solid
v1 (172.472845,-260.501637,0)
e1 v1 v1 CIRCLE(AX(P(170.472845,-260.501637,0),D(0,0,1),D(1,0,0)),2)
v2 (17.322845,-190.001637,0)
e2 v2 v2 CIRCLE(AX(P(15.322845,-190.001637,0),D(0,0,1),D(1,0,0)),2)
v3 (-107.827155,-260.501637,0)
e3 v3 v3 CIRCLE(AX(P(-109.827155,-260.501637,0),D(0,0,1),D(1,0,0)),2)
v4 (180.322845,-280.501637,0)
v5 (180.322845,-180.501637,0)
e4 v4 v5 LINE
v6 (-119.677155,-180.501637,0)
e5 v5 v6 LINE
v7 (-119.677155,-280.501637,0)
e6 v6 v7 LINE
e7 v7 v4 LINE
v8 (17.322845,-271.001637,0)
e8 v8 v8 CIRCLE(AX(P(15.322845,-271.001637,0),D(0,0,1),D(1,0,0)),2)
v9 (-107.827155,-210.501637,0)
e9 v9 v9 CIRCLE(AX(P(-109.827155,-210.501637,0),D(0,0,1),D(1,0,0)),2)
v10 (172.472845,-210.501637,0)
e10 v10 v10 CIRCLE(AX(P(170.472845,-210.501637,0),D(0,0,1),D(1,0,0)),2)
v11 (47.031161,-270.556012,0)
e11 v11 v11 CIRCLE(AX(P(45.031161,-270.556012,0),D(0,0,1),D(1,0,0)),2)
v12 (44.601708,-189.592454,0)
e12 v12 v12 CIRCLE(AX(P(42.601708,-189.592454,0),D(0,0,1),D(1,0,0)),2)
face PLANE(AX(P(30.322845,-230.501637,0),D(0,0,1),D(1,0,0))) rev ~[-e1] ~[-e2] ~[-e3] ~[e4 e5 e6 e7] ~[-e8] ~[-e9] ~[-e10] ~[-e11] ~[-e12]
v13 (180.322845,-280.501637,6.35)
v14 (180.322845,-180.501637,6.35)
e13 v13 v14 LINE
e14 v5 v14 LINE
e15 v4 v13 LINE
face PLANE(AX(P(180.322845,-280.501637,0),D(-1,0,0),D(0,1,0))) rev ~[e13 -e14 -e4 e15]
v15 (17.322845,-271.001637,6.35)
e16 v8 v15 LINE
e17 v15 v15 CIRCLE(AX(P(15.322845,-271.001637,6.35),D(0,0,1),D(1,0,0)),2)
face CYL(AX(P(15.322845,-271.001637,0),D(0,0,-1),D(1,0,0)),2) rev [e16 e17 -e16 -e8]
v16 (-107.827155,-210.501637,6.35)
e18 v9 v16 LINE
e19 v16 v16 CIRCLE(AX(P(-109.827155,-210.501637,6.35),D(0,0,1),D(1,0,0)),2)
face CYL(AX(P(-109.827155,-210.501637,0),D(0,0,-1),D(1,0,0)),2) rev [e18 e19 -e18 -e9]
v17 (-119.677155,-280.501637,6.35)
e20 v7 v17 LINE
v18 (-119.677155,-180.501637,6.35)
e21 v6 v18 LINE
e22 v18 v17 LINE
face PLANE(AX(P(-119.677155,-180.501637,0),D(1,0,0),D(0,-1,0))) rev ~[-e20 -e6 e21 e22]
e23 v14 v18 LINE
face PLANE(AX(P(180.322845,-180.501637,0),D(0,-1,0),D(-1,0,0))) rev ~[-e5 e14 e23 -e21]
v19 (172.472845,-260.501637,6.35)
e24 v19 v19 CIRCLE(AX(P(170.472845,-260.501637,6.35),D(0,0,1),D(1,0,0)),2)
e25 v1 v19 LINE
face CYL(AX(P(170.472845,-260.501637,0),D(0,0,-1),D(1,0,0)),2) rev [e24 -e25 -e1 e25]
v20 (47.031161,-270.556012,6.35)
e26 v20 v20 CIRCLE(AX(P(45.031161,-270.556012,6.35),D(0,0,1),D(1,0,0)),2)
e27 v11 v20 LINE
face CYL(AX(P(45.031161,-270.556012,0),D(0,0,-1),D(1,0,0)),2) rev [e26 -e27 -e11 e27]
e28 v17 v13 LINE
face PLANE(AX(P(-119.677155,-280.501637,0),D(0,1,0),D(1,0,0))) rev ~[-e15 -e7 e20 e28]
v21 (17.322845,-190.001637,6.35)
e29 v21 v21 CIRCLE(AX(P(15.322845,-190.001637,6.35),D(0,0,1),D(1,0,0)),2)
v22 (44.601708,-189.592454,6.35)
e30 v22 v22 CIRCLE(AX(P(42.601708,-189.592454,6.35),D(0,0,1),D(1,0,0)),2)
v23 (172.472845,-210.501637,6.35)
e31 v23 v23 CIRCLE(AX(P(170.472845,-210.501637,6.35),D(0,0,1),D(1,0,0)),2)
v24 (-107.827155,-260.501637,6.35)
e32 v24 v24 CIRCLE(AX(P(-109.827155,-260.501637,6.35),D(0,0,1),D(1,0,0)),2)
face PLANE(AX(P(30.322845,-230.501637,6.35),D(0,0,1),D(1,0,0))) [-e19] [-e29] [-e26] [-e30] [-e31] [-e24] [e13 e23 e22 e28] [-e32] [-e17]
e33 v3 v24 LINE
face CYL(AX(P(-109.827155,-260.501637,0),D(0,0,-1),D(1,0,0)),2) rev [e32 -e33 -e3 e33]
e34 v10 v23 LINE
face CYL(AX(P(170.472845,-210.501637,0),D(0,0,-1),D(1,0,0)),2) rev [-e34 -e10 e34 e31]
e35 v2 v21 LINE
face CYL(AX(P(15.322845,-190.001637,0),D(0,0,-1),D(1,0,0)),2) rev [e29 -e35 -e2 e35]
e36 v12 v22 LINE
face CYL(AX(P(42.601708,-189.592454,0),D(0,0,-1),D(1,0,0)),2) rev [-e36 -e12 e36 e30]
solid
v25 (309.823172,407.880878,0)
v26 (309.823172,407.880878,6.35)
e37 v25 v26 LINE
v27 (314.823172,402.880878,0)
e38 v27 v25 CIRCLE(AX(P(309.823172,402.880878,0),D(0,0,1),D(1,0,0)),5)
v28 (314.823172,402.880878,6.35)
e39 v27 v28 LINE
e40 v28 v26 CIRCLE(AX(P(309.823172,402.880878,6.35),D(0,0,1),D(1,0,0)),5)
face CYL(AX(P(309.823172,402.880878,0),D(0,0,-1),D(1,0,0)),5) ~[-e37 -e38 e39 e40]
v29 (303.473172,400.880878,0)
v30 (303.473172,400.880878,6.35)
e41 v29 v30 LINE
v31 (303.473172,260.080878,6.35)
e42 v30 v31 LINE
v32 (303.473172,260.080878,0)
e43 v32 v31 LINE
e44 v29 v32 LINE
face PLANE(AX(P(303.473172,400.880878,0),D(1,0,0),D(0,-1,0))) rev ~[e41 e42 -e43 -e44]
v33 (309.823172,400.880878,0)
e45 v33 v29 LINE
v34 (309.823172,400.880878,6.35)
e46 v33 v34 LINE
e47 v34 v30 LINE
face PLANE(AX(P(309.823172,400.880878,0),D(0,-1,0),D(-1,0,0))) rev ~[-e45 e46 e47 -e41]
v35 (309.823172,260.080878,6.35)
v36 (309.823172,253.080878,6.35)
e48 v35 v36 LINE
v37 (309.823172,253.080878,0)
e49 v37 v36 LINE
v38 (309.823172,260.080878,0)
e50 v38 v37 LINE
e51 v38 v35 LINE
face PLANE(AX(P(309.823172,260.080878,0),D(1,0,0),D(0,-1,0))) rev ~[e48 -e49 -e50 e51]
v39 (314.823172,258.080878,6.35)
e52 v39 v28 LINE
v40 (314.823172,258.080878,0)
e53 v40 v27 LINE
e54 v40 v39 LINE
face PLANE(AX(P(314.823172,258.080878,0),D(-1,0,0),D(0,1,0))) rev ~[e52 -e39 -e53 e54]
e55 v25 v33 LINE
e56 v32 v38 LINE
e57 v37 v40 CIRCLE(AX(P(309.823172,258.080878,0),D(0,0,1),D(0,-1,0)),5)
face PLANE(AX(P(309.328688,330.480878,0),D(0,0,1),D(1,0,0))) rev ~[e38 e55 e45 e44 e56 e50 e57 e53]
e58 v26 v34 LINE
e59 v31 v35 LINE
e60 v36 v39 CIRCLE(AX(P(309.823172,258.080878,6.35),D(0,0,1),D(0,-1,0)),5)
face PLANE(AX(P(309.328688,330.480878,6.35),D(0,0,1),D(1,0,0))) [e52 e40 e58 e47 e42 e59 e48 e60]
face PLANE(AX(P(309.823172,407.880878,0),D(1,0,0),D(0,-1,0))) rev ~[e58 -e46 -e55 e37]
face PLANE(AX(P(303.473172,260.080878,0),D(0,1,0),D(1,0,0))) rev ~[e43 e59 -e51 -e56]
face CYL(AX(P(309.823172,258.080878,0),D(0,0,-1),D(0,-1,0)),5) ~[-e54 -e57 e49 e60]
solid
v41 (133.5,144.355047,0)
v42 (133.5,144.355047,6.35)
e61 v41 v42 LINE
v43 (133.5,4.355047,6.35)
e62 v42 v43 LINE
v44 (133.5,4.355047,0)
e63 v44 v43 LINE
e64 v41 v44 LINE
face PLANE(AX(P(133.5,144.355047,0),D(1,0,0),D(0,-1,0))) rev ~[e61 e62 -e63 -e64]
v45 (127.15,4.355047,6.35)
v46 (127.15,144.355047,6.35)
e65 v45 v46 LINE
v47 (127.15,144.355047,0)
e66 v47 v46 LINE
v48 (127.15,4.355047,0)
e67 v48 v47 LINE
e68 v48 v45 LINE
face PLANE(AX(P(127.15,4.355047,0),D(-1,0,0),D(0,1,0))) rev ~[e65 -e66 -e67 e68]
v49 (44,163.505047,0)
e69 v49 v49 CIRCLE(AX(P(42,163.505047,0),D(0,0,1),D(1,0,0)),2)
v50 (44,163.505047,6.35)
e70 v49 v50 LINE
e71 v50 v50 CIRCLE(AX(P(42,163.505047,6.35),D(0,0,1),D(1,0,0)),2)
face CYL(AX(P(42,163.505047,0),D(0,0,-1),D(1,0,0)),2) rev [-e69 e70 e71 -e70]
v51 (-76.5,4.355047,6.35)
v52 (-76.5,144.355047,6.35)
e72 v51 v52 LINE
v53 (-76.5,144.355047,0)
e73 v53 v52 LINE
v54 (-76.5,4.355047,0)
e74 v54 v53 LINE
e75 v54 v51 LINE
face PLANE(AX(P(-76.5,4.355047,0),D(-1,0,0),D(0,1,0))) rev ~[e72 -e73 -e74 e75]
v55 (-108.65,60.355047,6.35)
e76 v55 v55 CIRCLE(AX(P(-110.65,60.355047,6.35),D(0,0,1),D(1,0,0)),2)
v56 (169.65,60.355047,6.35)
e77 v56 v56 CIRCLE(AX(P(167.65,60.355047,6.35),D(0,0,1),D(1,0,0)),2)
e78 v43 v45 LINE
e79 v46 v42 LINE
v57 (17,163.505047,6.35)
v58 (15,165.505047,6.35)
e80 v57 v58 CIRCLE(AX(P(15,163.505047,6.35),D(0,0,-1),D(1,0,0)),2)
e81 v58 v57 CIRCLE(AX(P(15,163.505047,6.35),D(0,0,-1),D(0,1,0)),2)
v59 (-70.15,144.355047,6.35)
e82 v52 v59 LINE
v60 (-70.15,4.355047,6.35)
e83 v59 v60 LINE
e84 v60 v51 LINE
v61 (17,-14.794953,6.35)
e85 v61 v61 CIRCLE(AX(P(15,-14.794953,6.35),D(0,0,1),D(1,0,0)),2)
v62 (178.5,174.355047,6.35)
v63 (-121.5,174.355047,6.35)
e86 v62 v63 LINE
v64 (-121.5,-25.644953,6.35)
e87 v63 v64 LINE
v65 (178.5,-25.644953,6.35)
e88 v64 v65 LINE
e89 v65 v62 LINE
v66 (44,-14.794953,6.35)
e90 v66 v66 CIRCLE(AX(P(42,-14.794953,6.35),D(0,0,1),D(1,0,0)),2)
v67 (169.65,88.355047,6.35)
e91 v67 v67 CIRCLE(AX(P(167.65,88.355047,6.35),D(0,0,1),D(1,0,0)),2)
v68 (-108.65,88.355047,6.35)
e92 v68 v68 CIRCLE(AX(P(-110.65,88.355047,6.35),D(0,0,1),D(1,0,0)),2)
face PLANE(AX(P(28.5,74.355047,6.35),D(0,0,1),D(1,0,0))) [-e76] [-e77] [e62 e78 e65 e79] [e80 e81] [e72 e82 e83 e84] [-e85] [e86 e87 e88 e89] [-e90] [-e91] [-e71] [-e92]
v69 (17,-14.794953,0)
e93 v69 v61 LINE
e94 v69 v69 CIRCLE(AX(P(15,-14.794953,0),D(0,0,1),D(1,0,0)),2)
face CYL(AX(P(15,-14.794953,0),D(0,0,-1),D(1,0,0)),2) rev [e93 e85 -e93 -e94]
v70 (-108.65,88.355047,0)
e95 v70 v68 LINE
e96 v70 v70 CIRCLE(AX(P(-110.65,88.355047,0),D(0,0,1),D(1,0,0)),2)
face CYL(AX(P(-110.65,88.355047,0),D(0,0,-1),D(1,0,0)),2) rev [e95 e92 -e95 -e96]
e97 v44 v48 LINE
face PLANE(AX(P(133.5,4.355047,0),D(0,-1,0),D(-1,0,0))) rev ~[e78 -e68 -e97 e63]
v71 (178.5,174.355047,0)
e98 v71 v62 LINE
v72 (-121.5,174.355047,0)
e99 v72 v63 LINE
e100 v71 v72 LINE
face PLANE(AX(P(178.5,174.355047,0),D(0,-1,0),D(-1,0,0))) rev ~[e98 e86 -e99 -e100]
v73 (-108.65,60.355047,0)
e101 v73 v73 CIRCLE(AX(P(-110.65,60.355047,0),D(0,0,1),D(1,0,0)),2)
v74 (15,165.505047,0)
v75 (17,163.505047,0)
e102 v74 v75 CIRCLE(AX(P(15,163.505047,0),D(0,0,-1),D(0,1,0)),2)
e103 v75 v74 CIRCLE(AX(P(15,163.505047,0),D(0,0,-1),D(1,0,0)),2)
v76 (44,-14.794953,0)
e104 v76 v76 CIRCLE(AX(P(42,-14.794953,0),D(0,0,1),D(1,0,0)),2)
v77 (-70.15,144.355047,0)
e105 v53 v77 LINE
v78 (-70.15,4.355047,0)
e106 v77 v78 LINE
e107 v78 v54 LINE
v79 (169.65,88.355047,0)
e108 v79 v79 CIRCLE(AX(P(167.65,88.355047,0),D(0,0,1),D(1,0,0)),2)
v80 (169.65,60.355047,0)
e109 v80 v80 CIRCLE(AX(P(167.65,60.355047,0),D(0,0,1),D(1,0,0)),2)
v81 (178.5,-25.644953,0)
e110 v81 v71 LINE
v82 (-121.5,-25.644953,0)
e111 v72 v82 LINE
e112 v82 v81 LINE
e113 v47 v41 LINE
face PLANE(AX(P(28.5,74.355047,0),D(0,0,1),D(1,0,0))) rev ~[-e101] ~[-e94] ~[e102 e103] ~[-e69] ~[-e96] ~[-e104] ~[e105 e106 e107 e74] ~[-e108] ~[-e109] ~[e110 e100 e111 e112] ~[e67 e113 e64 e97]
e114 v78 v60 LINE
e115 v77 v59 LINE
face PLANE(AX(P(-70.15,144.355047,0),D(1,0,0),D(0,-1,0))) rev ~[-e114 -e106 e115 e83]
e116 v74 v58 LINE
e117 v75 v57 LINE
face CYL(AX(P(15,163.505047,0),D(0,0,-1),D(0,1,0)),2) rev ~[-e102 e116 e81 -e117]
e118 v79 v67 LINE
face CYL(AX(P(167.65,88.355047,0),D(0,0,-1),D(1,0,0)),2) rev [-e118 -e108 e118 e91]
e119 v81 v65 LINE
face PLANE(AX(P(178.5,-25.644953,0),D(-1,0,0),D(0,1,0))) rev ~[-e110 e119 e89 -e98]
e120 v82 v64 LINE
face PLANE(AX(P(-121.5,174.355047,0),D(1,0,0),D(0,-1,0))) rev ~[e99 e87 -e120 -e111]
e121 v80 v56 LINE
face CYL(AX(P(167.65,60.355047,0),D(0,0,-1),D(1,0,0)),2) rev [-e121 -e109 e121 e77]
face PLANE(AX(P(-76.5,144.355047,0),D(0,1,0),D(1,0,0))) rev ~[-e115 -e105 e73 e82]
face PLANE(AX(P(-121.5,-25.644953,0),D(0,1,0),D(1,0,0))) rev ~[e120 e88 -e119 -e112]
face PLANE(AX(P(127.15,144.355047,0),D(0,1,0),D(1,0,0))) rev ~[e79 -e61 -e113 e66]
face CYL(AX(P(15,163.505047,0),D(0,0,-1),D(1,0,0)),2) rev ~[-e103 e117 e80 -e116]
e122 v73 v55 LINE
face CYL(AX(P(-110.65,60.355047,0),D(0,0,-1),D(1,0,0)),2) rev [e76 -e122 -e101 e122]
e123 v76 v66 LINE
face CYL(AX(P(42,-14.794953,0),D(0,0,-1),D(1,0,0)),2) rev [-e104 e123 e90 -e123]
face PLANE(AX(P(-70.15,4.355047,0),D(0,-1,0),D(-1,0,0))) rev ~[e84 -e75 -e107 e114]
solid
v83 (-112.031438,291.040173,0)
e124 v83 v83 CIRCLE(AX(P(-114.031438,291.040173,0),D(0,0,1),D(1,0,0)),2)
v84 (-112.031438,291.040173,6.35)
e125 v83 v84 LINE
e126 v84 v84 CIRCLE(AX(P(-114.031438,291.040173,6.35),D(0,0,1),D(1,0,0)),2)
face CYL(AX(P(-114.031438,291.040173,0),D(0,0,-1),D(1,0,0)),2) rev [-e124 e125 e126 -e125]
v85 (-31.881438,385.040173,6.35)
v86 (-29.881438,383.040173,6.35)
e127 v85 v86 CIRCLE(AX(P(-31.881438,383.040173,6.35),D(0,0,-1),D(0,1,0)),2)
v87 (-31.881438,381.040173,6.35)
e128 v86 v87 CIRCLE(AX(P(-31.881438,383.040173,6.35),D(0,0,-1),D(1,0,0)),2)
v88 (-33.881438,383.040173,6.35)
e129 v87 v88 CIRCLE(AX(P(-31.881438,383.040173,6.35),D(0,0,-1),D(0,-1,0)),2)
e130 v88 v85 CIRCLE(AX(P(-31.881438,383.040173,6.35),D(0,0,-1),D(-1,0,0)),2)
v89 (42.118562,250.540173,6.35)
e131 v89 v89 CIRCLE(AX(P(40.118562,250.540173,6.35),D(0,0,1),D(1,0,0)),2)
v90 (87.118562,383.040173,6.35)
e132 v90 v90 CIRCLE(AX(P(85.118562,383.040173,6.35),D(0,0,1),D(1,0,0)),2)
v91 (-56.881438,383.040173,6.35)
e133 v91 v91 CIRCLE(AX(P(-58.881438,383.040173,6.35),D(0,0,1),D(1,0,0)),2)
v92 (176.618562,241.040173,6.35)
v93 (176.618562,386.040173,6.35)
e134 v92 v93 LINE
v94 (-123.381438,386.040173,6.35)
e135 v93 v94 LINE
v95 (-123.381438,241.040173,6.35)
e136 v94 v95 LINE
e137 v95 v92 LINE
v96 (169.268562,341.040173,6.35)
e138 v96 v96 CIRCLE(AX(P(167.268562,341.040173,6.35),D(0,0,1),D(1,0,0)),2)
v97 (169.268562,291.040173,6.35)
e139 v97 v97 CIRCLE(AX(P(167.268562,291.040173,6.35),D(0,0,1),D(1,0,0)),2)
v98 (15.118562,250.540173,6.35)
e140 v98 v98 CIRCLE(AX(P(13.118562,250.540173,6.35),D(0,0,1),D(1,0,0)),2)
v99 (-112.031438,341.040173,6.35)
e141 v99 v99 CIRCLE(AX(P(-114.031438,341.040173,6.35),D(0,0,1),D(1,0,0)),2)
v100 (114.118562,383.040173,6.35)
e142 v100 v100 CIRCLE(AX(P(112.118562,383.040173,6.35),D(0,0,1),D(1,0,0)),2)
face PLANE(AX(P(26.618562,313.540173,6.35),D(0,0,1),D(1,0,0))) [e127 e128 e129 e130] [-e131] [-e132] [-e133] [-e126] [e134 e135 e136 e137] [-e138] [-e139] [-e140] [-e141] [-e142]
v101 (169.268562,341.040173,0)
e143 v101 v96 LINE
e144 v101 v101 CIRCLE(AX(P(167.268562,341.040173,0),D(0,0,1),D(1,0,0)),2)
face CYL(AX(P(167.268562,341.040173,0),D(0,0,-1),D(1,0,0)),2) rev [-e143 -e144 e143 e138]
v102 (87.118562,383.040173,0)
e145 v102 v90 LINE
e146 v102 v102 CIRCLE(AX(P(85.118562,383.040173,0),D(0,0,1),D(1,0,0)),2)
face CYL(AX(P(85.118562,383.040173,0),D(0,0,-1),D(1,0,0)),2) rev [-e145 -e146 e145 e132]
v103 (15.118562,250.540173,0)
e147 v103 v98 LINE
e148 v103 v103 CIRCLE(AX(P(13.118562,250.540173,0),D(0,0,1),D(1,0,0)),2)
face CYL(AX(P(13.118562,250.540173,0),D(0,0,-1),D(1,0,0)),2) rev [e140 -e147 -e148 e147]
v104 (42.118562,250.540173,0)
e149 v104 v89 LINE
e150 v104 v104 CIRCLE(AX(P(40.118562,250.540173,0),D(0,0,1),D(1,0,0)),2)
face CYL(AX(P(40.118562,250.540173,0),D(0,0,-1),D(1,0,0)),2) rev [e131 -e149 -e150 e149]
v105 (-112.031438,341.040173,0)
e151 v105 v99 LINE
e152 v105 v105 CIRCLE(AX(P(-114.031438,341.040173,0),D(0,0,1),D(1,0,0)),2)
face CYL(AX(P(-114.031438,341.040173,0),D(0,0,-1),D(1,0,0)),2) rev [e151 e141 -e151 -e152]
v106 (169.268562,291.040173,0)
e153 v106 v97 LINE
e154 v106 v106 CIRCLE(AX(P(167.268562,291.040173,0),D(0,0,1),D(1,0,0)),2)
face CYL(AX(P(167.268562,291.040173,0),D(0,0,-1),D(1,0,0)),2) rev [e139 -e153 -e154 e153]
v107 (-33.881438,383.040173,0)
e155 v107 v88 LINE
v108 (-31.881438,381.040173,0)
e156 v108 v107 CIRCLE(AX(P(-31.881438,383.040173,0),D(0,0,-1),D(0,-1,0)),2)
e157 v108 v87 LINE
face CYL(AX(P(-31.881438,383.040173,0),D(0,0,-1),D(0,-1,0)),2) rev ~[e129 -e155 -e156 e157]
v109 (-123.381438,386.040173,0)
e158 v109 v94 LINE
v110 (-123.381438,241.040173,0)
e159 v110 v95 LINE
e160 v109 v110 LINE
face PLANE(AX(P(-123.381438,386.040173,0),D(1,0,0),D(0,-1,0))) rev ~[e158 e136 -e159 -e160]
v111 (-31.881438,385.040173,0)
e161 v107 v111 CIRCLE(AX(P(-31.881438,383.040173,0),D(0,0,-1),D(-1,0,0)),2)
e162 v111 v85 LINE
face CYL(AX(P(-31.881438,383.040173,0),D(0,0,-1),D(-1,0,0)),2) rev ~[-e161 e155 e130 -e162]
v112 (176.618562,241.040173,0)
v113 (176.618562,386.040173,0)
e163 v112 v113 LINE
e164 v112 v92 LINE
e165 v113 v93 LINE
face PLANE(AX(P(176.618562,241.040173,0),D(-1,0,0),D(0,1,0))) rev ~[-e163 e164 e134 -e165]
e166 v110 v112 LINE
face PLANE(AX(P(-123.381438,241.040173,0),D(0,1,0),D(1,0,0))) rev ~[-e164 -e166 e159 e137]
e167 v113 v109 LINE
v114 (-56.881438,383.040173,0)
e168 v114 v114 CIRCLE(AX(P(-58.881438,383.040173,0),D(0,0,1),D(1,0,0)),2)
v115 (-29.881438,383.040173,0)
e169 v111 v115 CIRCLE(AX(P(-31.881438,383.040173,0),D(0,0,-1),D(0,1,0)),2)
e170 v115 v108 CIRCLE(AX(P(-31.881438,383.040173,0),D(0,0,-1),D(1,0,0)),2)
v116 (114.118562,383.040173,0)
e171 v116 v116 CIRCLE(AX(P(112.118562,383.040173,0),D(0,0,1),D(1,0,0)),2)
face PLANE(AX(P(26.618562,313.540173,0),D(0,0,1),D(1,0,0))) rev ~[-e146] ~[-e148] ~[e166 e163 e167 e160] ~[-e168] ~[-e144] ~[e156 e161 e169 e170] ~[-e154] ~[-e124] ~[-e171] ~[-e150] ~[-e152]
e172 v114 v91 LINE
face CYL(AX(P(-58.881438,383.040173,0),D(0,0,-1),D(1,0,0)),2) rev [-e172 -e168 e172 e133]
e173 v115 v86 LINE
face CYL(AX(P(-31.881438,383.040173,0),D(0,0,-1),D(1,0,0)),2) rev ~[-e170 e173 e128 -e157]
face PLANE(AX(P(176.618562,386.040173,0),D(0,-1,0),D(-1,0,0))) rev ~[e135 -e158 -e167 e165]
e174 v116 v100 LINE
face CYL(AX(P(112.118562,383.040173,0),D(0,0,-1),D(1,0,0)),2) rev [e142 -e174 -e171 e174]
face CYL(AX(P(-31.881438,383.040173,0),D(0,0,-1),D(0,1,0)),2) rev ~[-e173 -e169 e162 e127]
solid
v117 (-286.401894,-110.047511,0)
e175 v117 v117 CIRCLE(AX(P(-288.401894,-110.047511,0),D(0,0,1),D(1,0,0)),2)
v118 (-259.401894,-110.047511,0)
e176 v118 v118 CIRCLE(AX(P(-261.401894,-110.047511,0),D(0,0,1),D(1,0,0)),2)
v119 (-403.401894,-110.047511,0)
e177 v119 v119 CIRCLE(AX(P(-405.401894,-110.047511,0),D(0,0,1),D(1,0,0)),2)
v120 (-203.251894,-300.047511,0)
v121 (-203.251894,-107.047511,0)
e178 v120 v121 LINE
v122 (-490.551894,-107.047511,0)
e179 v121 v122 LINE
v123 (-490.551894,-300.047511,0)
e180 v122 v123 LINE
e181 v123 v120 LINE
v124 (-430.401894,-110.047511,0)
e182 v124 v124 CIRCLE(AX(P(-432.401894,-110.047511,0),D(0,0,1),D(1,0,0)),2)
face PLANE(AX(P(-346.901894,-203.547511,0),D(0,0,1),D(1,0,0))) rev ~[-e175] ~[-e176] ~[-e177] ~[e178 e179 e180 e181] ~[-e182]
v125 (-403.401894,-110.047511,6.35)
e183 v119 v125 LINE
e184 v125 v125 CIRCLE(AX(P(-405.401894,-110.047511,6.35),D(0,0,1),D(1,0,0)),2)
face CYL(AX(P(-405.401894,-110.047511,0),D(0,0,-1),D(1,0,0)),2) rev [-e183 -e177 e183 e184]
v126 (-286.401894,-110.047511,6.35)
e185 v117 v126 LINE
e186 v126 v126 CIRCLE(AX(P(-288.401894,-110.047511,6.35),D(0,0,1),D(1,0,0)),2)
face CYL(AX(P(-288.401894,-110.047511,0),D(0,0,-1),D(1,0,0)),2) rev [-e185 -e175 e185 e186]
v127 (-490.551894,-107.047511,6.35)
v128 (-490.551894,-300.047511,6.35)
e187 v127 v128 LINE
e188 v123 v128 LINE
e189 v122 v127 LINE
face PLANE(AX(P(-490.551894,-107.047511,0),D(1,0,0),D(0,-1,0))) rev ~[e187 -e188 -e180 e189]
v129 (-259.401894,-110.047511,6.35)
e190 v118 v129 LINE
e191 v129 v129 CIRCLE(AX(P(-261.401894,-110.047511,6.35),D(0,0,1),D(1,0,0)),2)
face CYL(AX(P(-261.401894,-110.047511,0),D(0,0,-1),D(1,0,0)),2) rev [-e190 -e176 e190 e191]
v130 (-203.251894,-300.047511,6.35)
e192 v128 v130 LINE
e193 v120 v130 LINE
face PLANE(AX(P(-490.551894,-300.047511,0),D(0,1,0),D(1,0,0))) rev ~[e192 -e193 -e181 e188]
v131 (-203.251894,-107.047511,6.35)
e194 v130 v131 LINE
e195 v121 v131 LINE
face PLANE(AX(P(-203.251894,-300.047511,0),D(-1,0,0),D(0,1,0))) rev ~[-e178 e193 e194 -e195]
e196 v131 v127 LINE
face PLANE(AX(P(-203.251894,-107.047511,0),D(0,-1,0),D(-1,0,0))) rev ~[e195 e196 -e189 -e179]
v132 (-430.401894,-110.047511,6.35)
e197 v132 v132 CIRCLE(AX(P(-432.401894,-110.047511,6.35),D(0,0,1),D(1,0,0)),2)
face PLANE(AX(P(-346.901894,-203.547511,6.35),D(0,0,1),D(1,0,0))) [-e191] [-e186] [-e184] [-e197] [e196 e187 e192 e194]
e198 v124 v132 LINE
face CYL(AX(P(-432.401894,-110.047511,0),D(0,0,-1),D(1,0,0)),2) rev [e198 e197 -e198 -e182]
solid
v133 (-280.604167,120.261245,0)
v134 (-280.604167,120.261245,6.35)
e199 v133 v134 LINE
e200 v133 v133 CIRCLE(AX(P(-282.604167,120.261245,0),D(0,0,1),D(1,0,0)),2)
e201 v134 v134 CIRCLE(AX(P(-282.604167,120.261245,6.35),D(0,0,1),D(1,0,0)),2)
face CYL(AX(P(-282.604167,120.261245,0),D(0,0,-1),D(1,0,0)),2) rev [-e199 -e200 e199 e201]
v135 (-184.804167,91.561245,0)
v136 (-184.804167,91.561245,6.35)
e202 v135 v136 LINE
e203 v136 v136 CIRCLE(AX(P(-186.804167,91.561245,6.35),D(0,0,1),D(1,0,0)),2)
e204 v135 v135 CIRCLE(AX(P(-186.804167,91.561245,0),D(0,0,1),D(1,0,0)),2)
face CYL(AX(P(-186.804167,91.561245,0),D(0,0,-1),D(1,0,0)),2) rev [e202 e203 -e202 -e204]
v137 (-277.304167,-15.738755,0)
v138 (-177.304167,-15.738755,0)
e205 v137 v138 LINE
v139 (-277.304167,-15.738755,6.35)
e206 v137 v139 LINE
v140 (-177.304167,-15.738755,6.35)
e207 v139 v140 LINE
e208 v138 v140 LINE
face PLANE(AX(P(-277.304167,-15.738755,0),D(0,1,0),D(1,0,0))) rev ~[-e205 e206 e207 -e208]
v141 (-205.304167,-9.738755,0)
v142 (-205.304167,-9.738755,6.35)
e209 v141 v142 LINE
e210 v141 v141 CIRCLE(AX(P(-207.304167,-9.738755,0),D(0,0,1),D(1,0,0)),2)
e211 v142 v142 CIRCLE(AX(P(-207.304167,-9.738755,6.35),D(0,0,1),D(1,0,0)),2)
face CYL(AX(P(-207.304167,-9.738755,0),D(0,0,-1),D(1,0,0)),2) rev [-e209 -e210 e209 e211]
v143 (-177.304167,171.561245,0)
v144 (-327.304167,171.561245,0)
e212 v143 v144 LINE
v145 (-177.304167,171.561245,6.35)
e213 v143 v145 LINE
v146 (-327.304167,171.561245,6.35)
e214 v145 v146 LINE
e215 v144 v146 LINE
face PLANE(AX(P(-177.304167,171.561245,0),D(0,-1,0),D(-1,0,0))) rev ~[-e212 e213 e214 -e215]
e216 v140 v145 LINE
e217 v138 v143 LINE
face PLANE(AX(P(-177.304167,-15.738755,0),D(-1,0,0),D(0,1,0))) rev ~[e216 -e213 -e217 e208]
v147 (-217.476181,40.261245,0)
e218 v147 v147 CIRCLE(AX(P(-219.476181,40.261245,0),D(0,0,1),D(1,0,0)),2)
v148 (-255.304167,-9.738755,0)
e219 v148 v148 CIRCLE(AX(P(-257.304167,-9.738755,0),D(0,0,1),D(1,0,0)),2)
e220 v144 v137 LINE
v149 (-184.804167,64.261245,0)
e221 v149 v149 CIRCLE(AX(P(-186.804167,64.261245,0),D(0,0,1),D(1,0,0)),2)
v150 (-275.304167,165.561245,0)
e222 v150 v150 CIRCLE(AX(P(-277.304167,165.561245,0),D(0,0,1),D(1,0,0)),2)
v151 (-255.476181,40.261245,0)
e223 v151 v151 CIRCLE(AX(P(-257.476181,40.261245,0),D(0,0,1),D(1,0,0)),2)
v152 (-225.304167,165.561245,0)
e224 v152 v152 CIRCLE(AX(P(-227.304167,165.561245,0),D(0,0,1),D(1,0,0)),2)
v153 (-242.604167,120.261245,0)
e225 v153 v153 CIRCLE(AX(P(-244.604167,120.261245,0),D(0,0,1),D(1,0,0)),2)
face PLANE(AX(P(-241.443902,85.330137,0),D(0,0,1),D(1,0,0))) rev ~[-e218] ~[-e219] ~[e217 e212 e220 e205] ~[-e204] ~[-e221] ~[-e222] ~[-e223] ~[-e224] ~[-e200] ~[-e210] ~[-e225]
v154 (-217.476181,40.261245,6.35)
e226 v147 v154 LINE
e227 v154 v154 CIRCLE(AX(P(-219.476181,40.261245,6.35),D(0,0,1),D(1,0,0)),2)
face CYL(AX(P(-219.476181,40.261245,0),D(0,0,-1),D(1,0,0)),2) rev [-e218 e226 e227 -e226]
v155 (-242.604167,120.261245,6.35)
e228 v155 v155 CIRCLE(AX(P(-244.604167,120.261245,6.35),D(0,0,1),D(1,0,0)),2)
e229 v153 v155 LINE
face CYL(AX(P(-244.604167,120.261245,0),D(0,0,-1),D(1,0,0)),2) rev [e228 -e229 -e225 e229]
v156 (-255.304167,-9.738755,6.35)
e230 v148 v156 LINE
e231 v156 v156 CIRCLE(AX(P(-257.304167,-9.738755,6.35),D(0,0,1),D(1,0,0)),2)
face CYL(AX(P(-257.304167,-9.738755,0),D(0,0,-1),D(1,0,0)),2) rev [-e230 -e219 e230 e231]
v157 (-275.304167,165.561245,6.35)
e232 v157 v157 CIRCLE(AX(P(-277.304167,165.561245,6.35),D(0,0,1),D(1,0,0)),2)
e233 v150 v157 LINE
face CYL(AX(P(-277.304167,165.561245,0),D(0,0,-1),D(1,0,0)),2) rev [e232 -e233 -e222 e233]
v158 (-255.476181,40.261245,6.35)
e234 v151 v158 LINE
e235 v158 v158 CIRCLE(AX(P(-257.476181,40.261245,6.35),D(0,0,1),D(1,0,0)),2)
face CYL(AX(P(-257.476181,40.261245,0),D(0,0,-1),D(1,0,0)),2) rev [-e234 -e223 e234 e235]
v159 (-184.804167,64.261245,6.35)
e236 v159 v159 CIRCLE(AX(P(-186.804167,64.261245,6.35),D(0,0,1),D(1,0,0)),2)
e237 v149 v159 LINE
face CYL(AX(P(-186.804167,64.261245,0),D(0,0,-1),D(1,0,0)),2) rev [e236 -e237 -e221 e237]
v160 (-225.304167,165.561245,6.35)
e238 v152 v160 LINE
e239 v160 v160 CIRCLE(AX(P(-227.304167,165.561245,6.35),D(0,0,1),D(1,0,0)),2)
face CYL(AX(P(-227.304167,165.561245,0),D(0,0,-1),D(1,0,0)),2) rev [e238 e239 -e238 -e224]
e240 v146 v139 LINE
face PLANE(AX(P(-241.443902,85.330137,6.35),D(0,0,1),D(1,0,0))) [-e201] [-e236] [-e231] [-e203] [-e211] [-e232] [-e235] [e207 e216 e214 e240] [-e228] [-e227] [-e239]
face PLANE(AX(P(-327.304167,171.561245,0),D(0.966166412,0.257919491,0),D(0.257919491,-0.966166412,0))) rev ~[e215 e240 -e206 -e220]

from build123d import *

# Parameters (mm, degrees)
F1_R     = 2
F4_DEPTH = 6.35
F0_R     = 2
F3_R     = 2
F2_R     = 2
F5_DEPTH = 6.35
F6_R     = 2
F7_DEPTH = 6.35


# Not quite as in the source:
# - a feature names something its author has since deleted; it is built from what else it names


with BuildPart() as f4:
    # F1 (on Top) → F4 (new body)
    with BuildSketch(Plane.XY):
        Polygon((1.8228454292, -180.5016371835), (-119.6771545708, -180.5016371835), (-119.6771545708, -210.5016371835), (-119.6771545708, -260.5016371835), (-119.6771545708, -280.5016371835), (30.3228454292, -280.5016371835), (180.3228454292, -280.5016371835), (180.3228454292, -180.5016371835), (58.8228454292, -180.5016371835), (28.8228454292, -180.5016371835), (15.3228454292, -180.5016371835), align=None)
        with Locations((-109.8271545708, -260.5016371835)):
            Circle(F1_R, mode=Mode.SUBTRACT)
        with Locations((15.3228454292, -271.0016371835)):
            Circle(F1_R, mode=Mode.SUBTRACT)
        with Locations((45.0311610582, -270.556012449)):
            Circle(F1_R, mode=Mode.SUBTRACT)
        with Locations((170.4728454292, -260.5016371835)):
            Circle(F1_R, mode=Mode.SUBTRACT)
        with Locations((-109.8271545708, -210.5016371835)):
            Circle(F1_R, mode=Mode.SUBTRACT)
        with Locations((15.3228454292, -190.0016371835)):
            Circle(F1_R, mode=Mode.SUBTRACT)
        with Locations((170.4728454292, -210.5016371835)):
            Circle(F1_R, mode=Mode.SUBTRACT)
        with Locations((42.6017076852, -189.5924542496)):
            Circle(F1_R, mode=Mode.SUBTRACT)
    extrude(amount=F4_DEPTH)


with BuildPart() as f4b:
    # F0 (on Top) → F4, piece 2 (new body)
    with BuildSketch(Plane.XY):
        Polygon((28.5, 174.3550467463), (-121.5, 174.3550467463), (-121.5, 88.3550467463), (-121.5, 60.3550467463), (-121.5, -25.6449532537), (0, -25.6449532537), (57, -25.6449532537), (178.5, -25.6449532537), (178.5, 174.3550467463), align=None)
        with Locations((-110.65, 60.3550467463)):
            Circle(F0_R, mode=Mode.SUBTRACT)
        Polygon((-76.5, 144.3550467463), (-70.15, 144.3550467463), (-70.15, 4.3550467463), (-76.5, 4.3550467463), (-76.5, 44.3550467463), (-76.5, 74.3550467463), align=None, mode=Mode.SUBTRACT)
        with Locations((15, -14.7949532537)):
            Circle(F0_R, mode=Mode.SUBTRACT)
        with Locations((42, -14.7949532537)):
            Circle(F0_R, mode=Mode.SUBTRACT)
        with Locations((-110.65, 88.3550467463)):
            Circle(F0_R, mode=Mode.SUBTRACT)
        with BuildLine():
            ThreePointArc((17, 163.5050467463), (13.5857864376, 162.0908331839), (15, 165.5050467463))
            ThreePointArc((15, 165.5050467463), (16.4142135624, 164.9192603087), (17, 163.5050467463))
        make_face(mode=Mode.SUBTRACT)
        with Locations((42, 163.5050467463)):
            Circle(F0_R, mode=Mode.SUBTRACT)
        Polygon((127.15, 4.3550467463), (127.15, 144.3550467463), (133.5, 144.3550467463), (133.5, 74.3550467463), (133.5, 44.3550467463), (133.5, 4.3550467463), align=None, mode=Mode.SUBTRACT)
        with Locations((167.65, 60.3550467463)):
            Circle(F0_R, mode=Mode.SUBTRACT)
        with Locations((167.65, 88.3550467463)):
            Circle(F0_R, mode=Mode.SUBTRACT)
    extrude(amount=F4_DEPTH)

    # F0 (on Top) → F5 (join)
    with BuildSketch(Plane.XY):
        Polygon((28.5, 174.3550467463), (-121.5, 174.3550467463), (-121.5, 88.3550467463), (-121.5, 60.3550467463), (-121.5, -25.6449532537), (0, -25.6449532537), (57, -25.6449532537), (178.5, -25.6449532537), (178.5, 174.3550467463), align=None)
        with Locations((-110.65, 60.3550467463)):
            Circle(F0_R, mode=Mode.SUBTRACT)
        Polygon((-76.5, 144.3550467463), (-70.15, 144.3550467463), (-70.15, 4.3550467463), (-76.5, 4.3550467463), (-76.5, 44.3550467463), (-76.5, 74.3550467463), align=None, mode=Mode.SUBTRACT)
        with Locations((15, -14.7949532537)):
            Circle(F0_R, mode=Mode.SUBTRACT)
        with Locations((42, -14.7949532537)):
            Circle(F0_R, mode=Mode.SUBTRACT)
        with Locations((-110.65, 88.3550467463)):
            Circle(F0_R, mode=Mode.SUBTRACT)
        with BuildLine():
            ThreePointArc((17, 163.5050467463), (13.5857864376, 162.0908331839), (15, 165.5050467463))
            ThreePointArc((15, 165.5050467463), (16.4142135624, 164.9192603087), (17, 163.5050467463))
        make_face(mode=Mode.SUBTRACT)
        with Locations((42, 163.5050467463)):
            Circle(F0_R, mode=Mode.SUBTRACT)
        Polygon((127.15, 4.3550467463), (127.15, 144.3550467463), (133.5, 144.3550467463), (133.5, 74.3550467463), (133.5, 44.3550467463), (133.5, 4.3550467463), align=None, mode=Mode.SUBTRACT)
        with Locations((167.65, 60.3550467463)):
            Circle(F0_R, mode=Mode.SUBTRACT)
        with Locations((167.65, 88.3550467463)):
            Circle(F0_R, mode=Mode.SUBTRACT)
    extrude(amount=F5_DEPTH)


with BuildPart() as f4c:
    # F3 (on Top) → F4, piece 3 (new body)
    with BuildSketch(Plane.XY):
        Polygon((-46.8814379573, 386.040173464), (-123.3814379573, 386.040173464), (-123.3814379573, 341.040173464), (-123.3814379573, 336.040173464), (-123.3814379573, 291.040173464), (-123.3814379573, 286.040173464), (-123.3814379573, 241.040173464), (-1.8814379573, 241.040173464), (13.1185620427, 241.040173464), (26.6185620427, 241.040173464), (40.1185620427, 241.040173464), (55.1185620427, 241.040173464), (176.6185620427, 241.040173464), (176.6185620427, 386.040173464), (-19.8814379573, 386.040173464), (-31.8814379573, 386.040173464), align=None)
        with Locations((13.1185620427, 250.540173464)):
            Circle(F3_R, mode=Mode.SUBTRACT)
        with Locations((-114.0314379573, 291.040173464)):
            Circle(F3_R, mode=Mode.SUBTRACT)
        with Locations((40.1185620427, 250.540173464)):
            Circle(F3_R, mode=Mode.SUBTRACT)
        with Locations((167.2685620427, 291.040173464)):
            Circle(F3_R, mode=Mode.SUBTRACT)
        with Locations((-114.0314379573, 341.040173464)):
            Circle(F3_R, mode=Mode.SUBTRACT)
        with Locations((-58.8814379573, 383.040173464)):
            Circle(F3_R, mode=Mode.SUBTRACT)
        with BuildLine():
            ThreePointArc((-33.8814379573, 383.040173464), (-33.2956515197, 384.4543870263), (-31.8814379573, 385.040173464))
            ThreePointArc((-31.8814379573, 385.040173464), (-30.4672243949, 384.4543870263), (-29.8814379573, 383.040173464))
            ThreePointArc((-29.8814379573, 383.040173464), (-30.4672243949, 381.6259599016), (-31.8814379573, 381.040173464))
            ThreePointArc((-31.8814379573, 381.040173464), (-33.2956515197, 381.6259599016), (-33.8814379573, 383.040173464))
        make_face(mode=Mode.SUBTRACT)
        with Locations((167.2685620427, 341.040173464)):
            Circle(F3_R, mode=Mode.SUBTRACT)
        with Locations((85.1185620427, 383.040173464)):
            Circle(F3_R, mode=Mode.SUBTRACT)
        with Locations((112.1185620427, 383.040173464)):
            Circle(F3_R, mode=Mode.SUBTRACT)
    extrude(amount=F4_DEPTH)


with BuildPart() as f4d:
    # F2 (on Top) → F4, piece 4 (new body)
    with BuildSketch(Plane.XY):
        Polygon((-282.6041665554, 171.5612447582), (-327.3041665554, 171.5612447582), (-277.3041665554, -15.7387552418), (-257.3041665554, -15.7387552418), (-207.3041665554, -15.7387552418), (-177.3041665554, -15.7387552418), (-177.3041665554, 64.2612447582), (-177.3041665554, 91.5612447582), (-177.3041665554, 171.5612447582), (-208.6041665554, 171.5612447582), (-227.3041665554, 171.5612447582), (-244.6041665554, 171.5612447582), (-246.6041665554, 171.5612447582), (-277.3041665554, 171.5612447582), align=None)
        with Locations((-257.3041665554, -9.7387552418)):
            Circle(F2_R, mode=Mode.SUBTRACT)
        with Locations((-207.3041665554, -9.7387552418)):
            Circle(F2_R, mode=Mode.SUBTRACT)
        with Locations((-257.4761807919, 40.2612447582)):
            Circle(F2_R, mode=Mode.SUBTRACT)
        with Locations((-219.4761807919, 40.2612447582)):
            Circle(F2_R, mode=Mode.SUBTRACT)
        with Locations((-186.8041665554, 64.2612447582)):
            Circle(F2_R, mode=Mode.SUBTRACT)
        with Locations((-186.8041665554, 91.5612447582)):
            Circle(F2_R, mode=Mode.SUBTRACT)
        with Locations((-282.6041665554, 120.2612447582)):
            Circle(F2_R, mode=Mode.SUBTRACT)
        with Locations((-244.6041665554, 120.2612447582)):
            Circle(F2_R, mode=Mode.SUBTRACT)
        with Locations((-277.3041665554, 165.5612447582)):
            Circle(F2_R, mode=Mode.SUBTRACT)
        with Locations((-227.3041665554, 165.5612447582)):
            Circle(F2_R, mode=Mode.SUBTRACT)
    extrude(amount=F4_DEPTH)


with BuildPart() as f5:
    # F0 (on Top) → F5, piece 2 (new body)
    with BuildSketch(Plane.XY):
        with BuildLine():
            Line((309.8231719379, 400.8808784962), (303.4731719379, 400.8808784962))
            Line((303.4731719379, 400.8808784962), (303.4731719379, 260.0808784962))
            Line((303.4731719379, 260.0808784962), (309.8231719379, 260.0808784962))
            Line((309.8231719379, 260.0808784962), (309.8231719379, 253.0808784962))
            ThreePointArc((309.8231719379, 253.0808784962), (313.3587058439, 254.5453445902), (314.8231719379, 258.0808784962))
            Line((314.8231719379, 258.0808784962), (314.8231719379, 402.8808784962))
            ThreePointArc((314.8231719379, 402.8808784962), (313.3587058439, 406.4164124021), (309.8231719379, 407.8808784962))
            Line((309.8231719379, 407.8808784962), (309.8231719379, 400.8808784962))
        make_face()
    extrude(amount=F5_DEPTH)


with BuildPart() as f7:
    # F6 (on Top) → F7 (new body)
    with BuildSketch(Plane.XY):
        Polygon((-405.4018942118, -107.0475112595), (-490.5518942118, -107.0475112595), (-490.5518942118, -300.0475112595), (-203.2518942118, -300.0475112595), (-203.2518942118, -107.0475112595), (-346.9018942118, -107.0475112595), (-378.4018942118, -107.0475112595), align=None)
        with Locations((-432.4018942118, -110.0475112595)):
            Circle(F6_R, mode=Mode.SUBTRACT)
        with Locations((-405.4018942118, -110.0475112595)):
            Circle(F6_R, mode=Mode.SUBTRACT)
        with Locations((-288.4018942118, -110.0475112595)):
            Circle(F6_R, mode=Mode.SUBTRACT)
        with Locations((-261.4018942118, -110.0475112595)):
            Circle(F6_R, mode=Mode.SUBTRACT)
    extrude(amount=F7_DEPTH)


solid = Compound([f4.part, f4b.part, f4c.part, f4d.part, f5.part, f7.part])
